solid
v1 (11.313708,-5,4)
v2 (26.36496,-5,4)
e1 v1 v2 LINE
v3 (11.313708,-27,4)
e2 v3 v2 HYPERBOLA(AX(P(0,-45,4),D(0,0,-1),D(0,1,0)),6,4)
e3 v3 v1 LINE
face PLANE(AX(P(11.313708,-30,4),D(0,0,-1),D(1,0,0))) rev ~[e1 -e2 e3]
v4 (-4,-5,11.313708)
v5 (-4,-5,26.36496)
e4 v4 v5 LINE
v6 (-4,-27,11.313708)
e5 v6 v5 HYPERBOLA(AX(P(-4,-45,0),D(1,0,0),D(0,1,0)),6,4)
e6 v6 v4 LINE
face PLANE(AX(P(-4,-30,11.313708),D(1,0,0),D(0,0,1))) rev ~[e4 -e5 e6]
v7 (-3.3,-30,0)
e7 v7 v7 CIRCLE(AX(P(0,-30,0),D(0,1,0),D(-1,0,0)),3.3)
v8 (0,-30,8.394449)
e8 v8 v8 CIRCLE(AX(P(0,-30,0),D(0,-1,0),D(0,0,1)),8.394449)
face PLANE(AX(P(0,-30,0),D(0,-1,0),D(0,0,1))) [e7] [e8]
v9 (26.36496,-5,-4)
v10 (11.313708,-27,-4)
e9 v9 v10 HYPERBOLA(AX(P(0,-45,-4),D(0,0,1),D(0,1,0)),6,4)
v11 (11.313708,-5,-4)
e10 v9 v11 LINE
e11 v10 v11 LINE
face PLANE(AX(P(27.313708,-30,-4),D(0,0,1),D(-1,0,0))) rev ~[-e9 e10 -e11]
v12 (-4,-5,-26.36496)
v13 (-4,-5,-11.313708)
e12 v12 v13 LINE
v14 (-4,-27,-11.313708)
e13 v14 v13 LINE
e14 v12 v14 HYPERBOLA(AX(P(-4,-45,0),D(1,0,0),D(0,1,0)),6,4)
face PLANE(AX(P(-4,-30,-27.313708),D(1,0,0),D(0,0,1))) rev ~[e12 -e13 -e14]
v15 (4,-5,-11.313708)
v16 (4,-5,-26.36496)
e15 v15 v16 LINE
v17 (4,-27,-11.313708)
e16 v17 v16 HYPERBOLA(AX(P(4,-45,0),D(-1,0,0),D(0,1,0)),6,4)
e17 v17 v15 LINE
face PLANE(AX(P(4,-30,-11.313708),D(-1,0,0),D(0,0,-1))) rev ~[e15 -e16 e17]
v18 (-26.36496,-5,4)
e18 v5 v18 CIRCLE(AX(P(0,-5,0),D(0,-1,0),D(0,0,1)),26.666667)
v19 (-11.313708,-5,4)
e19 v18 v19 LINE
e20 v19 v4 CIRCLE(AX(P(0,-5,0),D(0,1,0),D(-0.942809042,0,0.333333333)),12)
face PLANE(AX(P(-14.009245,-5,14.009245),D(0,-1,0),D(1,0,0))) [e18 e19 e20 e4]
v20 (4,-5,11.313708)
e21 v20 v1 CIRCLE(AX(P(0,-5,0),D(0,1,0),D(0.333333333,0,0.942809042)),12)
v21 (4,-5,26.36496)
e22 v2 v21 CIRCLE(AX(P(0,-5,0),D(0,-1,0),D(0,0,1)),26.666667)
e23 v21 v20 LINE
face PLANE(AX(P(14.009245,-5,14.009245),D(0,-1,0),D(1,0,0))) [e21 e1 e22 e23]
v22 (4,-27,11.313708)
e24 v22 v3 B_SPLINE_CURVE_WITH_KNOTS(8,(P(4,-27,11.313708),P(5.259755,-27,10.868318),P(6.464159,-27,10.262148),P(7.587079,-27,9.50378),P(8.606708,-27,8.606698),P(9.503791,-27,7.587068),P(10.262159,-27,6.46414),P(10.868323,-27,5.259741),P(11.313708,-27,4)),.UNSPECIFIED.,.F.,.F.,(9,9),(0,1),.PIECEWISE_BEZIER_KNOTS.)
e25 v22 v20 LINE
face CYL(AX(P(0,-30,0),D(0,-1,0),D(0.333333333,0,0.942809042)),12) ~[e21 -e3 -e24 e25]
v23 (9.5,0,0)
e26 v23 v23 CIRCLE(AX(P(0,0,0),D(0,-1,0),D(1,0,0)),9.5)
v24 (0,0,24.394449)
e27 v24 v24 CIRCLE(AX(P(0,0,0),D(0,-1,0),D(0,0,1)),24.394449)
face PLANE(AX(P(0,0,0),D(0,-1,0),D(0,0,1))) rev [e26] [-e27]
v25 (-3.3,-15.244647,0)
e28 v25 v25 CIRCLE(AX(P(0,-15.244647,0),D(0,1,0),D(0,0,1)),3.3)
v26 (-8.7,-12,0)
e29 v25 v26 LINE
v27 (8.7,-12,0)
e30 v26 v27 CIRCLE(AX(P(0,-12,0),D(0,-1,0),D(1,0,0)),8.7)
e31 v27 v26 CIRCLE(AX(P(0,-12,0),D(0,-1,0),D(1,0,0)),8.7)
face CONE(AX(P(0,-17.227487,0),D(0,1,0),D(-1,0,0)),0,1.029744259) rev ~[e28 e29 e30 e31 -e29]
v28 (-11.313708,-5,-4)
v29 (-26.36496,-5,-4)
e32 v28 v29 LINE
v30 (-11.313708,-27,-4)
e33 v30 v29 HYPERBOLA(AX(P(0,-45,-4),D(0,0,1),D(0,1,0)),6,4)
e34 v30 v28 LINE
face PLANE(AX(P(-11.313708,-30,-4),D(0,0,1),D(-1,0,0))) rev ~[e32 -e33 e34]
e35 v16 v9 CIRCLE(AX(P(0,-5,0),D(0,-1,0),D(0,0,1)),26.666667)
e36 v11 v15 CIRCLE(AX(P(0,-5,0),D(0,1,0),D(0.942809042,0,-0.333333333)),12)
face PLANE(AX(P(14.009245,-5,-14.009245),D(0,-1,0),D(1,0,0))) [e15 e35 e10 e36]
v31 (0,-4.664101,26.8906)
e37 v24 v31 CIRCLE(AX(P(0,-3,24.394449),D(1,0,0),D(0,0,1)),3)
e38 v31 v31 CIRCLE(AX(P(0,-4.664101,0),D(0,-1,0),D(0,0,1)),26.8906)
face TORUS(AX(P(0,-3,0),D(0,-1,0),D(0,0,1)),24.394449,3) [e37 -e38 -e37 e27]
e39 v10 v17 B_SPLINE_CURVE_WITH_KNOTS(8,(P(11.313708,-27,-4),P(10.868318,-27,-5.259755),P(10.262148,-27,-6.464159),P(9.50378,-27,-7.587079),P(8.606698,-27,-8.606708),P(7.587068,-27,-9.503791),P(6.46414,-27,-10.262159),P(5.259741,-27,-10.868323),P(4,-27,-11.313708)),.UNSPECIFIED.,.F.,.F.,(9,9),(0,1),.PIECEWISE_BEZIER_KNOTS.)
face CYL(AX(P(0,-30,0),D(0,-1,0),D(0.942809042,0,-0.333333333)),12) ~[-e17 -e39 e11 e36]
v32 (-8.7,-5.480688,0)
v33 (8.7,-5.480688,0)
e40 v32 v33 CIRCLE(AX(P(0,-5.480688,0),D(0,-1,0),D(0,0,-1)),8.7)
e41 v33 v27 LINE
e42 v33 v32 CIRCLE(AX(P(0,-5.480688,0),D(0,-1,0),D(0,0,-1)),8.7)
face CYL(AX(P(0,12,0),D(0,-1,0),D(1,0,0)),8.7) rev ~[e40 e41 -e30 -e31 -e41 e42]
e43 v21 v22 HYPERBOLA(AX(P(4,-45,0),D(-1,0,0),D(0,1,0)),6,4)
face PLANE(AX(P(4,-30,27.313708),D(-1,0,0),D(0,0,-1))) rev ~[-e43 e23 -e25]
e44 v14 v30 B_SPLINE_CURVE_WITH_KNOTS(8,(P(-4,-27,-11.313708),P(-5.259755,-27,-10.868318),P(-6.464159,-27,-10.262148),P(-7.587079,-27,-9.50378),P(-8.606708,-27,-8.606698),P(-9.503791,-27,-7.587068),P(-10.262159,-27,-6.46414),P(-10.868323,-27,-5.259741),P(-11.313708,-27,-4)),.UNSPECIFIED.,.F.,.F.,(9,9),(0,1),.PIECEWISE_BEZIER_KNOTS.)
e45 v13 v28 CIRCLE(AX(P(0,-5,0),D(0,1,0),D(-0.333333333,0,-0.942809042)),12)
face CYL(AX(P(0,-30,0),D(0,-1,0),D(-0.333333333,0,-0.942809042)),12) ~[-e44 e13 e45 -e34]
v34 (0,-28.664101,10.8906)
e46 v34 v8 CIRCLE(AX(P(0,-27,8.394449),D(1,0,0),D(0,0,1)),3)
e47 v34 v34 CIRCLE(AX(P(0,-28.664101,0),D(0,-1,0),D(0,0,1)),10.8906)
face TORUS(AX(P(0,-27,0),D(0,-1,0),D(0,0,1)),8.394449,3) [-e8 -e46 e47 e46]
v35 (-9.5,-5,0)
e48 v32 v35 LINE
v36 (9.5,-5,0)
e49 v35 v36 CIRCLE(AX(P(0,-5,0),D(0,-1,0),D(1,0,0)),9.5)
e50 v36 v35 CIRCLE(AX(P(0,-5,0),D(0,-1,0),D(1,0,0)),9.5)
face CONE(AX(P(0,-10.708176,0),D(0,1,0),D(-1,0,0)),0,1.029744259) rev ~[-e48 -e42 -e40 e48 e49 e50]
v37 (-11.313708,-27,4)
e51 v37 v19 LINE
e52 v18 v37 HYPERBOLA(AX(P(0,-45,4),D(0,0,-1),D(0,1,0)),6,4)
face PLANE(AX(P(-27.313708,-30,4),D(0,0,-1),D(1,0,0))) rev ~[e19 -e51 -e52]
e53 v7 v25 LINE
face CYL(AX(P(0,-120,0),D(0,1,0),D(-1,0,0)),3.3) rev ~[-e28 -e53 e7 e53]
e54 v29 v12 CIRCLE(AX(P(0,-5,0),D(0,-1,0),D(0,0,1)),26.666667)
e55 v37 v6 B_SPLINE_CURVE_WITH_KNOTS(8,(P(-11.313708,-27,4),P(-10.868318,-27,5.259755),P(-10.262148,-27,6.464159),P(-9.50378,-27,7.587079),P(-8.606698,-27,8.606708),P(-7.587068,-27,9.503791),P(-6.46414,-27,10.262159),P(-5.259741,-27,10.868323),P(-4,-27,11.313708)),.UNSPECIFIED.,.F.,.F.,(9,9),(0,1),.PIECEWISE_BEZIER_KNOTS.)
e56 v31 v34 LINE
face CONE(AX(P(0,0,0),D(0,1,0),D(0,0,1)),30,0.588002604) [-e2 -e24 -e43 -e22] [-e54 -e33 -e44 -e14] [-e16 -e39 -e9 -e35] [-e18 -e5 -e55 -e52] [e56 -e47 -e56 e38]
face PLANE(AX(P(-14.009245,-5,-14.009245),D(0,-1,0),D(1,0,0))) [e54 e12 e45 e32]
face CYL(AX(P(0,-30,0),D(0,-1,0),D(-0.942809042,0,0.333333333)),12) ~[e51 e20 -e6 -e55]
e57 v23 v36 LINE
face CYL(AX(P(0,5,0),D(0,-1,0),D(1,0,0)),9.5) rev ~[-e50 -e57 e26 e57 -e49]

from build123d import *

# Parameters (mm, degrees)
F3_D     = 6.6
F5_D     = 17.4
F5_DEPTH = 12
F5_TIP   = 5.2274873855
F6_D     = 19
F6_DEPTH = 5
F6_TIP   = 5.7081758808
F7_DEPTH = 25
F8_R     = 3


with BuildPart() as f1:
    # F0 (on Right) → F1 (revolve)
    with BuildSketch(Plane.YZ):
        Polygon((-30, 0), (0, 0), (0, 30), (-30, 10), align=None)
    revolve(axis=Axis((0, -15, 0), (0, -1, 0)))

    # F3 (through all)
    with Locations(Plane.XZ.offset(30)):
        with Locations((0, 0)):
            Hole(F3_D / 2)

    # F5
    with Locations(Plane(origin=(0, 0, 0), x_dir=(-1, 0, 0), z_dir=(0, 1, 0))):
        with Locations((0, 0)):
            Hole(F5_D / 2, depth=F5_DEPTH)
            with Locations((0, 0, -(F5_DEPTH + F5_TIP / 2))):  # 118° drill point
                Cone(0, F5_D / 2, F5_TIP, mode=Mode.SUBTRACT)

    # F6
    with Locations(Plane(origin=(0, 0, 0), x_dir=(-1, 0, 0), z_dir=(0, 1, 0))):
        with Locations((0, 0)):
            Hole(F6_D / 2, depth=F6_DEPTH)
            with Locations((0, 0, -(F6_DEPTH + F6_TIP / 2))):  # 118° drill point
                Cone(0, F6_D / 2, F6_TIP, mode=Mode.SUBTRACT)

    # F2 (on face) → F7 (cut)
    with BuildSketch(Plane.XZ.offset(30)):
        with BuildLine():
            ThreePointArc((11.313708499, -4), (8.4852813742, -8.4852813742), (4, -11.313708499))
            Line((4, -11.313708499), (4, -27.313708499))
            ThreePointArc((4, -27.313708499), (19.5197165959, -19.5197165959), (27.313708499, -4))
            Line((27.313708499, -4), (11.313708499, -4))
        make_face()
        with BuildLine():
            Line((11.313708499, 4), (27.313708499, 4))
            ThreePointArc((27.313708499, 4), (19.5197165959, 19.5197165959), (4, 27.313708499))
            Line((4, 27.313708499), (4, 11.313708499))
            ThreePointArc((4, 11.313708499), (8.4852813742, 8.4852813742), (11.313708499, 4))
        make_face()
        with BuildLine():
            Line((-4, 11.313708499), (-4, 27.313708499))
            ThreePointArc((-4, 27.313708499), (-19.5197165959, 19.5197165959), (-27.313708499, 4))
            Line((-27.313708499, 4), (-11.313708499, 4))
            ThreePointArc((-11.313708499, 4), (-8.4852813742, 8.4852813742), (-4, 11.313708499))
        make_face()
        with BuildLine():
            Line((-11.313708499, -4), (-27.313708499, -4))
            ThreePointArc((-27.313708499, -4), (-19.5197165959, -19.5197165959), (-4, -27.313708499))
            Line((-4, -27.313708499), (-4, -11.313708499))
            ThreePointArc((-4, -11.313708499), (-8.4852813742, -8.4852813742), (-11.313708499, -4))
        make_face()
    extrude(amount=-F7_DEPTH, mode=Mode.SUBTRACT)

    # F8
    f8_edges = [f1.edges().sort_by_distance(p)[0] for p in [
        (0, 0, -30),
        (0, -30, -10),
    ]]
    fillet(f8_edges, radius=F8_R)


solid = f1.part
